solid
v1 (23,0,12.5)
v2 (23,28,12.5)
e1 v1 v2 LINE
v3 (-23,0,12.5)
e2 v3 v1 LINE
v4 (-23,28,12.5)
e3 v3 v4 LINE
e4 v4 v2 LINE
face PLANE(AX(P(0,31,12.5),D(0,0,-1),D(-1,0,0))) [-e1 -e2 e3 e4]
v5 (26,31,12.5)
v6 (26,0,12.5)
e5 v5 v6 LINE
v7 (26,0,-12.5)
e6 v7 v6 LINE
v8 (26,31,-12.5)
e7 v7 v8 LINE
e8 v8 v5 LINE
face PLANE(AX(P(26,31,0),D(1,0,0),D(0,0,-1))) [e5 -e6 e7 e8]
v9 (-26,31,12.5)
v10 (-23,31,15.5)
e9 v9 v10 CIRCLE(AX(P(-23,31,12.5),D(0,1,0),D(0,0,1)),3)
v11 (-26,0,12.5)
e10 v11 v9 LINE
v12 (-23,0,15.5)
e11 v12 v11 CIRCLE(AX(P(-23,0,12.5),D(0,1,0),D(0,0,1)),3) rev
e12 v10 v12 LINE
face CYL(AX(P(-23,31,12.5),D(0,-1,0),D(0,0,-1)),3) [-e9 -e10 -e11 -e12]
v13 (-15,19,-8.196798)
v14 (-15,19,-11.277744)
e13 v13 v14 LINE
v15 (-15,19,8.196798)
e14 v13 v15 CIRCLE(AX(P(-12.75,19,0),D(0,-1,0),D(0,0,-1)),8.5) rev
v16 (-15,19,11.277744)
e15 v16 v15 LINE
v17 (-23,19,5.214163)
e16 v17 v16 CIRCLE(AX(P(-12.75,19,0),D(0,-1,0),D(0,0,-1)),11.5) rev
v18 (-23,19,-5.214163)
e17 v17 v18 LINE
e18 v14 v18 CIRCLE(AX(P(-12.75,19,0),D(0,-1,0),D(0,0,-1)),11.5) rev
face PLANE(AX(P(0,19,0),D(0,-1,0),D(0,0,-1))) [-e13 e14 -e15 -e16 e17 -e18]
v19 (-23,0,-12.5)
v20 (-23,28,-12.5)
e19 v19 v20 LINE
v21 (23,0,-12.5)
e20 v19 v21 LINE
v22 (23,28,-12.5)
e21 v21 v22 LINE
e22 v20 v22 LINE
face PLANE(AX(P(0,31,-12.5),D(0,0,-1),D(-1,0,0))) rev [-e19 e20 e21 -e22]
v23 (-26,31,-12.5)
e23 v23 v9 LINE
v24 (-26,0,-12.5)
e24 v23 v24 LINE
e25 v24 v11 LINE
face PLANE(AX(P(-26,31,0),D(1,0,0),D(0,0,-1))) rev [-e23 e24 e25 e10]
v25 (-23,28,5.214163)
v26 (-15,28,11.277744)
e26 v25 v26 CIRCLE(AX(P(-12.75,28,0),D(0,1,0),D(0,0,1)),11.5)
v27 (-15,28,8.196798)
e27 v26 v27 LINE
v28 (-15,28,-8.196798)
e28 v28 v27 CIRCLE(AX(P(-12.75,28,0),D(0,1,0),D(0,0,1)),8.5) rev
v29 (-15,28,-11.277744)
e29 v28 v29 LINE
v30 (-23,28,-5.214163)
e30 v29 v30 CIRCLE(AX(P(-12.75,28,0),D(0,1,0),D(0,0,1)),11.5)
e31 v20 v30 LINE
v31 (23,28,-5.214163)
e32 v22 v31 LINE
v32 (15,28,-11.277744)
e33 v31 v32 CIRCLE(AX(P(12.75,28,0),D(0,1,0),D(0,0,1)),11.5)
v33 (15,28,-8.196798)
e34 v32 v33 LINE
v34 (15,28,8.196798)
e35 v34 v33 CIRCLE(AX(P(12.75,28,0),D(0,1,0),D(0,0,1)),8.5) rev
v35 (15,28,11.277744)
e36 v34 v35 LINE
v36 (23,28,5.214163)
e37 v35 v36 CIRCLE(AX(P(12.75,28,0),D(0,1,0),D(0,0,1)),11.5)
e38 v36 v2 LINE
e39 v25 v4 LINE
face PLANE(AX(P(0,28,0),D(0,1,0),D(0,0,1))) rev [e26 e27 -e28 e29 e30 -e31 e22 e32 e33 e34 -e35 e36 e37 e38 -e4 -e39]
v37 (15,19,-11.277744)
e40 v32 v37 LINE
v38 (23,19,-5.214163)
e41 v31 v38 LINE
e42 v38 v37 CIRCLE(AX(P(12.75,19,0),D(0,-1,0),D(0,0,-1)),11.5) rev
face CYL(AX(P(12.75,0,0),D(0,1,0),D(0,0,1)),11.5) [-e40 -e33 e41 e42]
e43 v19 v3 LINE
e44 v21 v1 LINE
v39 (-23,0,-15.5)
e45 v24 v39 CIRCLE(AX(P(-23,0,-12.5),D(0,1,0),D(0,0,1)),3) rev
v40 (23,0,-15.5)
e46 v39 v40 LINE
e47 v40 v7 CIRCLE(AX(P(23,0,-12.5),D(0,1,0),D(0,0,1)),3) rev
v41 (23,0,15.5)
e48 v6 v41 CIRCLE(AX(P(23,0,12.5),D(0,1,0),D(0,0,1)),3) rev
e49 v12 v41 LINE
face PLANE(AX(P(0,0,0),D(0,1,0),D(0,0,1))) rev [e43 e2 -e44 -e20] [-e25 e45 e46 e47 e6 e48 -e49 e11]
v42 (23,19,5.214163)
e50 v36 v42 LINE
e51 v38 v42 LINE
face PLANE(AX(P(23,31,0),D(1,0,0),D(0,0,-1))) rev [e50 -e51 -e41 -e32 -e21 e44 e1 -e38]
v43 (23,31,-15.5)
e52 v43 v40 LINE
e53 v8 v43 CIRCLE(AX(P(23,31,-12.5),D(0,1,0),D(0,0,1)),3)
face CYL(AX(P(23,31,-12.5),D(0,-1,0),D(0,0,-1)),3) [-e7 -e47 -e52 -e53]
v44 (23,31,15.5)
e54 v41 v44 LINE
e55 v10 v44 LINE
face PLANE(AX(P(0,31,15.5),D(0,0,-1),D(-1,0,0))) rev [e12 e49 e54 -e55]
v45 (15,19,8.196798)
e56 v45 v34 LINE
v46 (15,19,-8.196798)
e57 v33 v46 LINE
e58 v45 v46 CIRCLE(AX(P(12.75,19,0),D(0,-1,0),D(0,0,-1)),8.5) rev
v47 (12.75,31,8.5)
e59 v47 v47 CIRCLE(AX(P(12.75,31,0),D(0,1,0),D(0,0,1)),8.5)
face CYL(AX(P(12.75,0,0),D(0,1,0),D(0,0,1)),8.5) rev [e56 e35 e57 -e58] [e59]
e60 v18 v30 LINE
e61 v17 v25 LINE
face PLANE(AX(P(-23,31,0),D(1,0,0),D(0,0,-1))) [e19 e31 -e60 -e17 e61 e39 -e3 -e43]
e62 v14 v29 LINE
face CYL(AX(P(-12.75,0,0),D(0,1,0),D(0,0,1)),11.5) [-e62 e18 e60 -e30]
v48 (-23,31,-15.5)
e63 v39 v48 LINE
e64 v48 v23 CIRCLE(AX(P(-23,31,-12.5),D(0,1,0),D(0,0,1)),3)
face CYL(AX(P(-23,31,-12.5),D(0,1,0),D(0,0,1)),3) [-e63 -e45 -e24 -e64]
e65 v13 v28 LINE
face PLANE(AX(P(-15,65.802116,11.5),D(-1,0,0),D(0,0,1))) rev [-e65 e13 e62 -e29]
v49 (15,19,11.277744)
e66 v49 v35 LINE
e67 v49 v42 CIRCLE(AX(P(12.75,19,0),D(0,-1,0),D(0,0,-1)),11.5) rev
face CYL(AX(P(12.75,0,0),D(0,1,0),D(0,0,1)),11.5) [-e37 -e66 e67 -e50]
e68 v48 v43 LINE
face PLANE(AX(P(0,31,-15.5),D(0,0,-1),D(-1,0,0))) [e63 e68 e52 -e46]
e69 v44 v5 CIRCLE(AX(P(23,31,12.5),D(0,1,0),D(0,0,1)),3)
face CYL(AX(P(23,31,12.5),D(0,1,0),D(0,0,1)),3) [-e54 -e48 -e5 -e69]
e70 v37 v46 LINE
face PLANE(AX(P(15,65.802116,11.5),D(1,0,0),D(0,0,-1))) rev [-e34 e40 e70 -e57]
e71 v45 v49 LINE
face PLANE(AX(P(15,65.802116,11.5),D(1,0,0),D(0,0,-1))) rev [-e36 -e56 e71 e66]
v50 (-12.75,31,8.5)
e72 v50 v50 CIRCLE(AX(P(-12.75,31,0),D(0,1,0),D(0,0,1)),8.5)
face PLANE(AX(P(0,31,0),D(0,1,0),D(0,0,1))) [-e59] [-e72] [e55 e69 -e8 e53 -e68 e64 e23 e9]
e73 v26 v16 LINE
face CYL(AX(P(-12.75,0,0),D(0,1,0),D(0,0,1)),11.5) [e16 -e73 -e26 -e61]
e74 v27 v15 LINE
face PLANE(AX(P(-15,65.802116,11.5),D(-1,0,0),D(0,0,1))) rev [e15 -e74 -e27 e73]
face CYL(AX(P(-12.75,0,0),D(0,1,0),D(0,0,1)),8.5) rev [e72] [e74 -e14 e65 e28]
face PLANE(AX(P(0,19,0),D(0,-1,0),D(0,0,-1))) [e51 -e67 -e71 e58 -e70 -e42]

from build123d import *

# Parameters (mm, degrees)
CROQUIS1_W              = 52
CROQUIS1_H              = 31
CROQUIS1_W_2            = 46
CROQUIS1_H_2            = 25
SALIENTE_EXTRUIR1_DEPTH = 31
CROQUIS2_R              = 8.5
CORTAR_EXTRUIR1_DEPTH   = 31
REDONDEO1_R             = 3
VACIADO1_DEPTH          = 28
CROQUIS3_W              = 46
CROQUIS3_H              = 25
CORTAR_EXTRUIR2_DEPTH   = 19
CROQUIS4_W              = 30
CROQUIS4_H              = 23
CORTAR_EXTRUIR3_DEPTH   = 9


# Read off the part's stored shape, not the designer's step: Vaciado1
with BuildPart() as part:
    # Croquis1 → Saliente-Extruir1 (new body)
    # profile 1 of 2: a face of its own
    with BuildSketch(Plane(origin=(0, 0, 0), x_dir=(1, 0, 0), z_dir=(0, 1, 0))):
        Rectangle(CROQUIS1_W, CROQUIS1_H)
        Rectangle(CROQUIS1_W_2, CROQUIS1_H_2, mode=Mode.SUBTRACT)
    # profile 2 of 2: a face of its own
    with BuildSketch(Plane(origin=(0, 0, 0), x_dir=(1, 0, 0), z_dir=(0, 1, 0))):
        Rectangle(CROQUIS1_W_2, CROQUIS1_H_2)
    extrude(amount=SALIENTE_EXTRUIR1_DEPTH)

    # Croquis2 → Cortar-Extruir1 (cut)
    with BuildSketch(Plane(origin=(0, 31, 0), x_dir=(1, 0, 0), z_dir=(0, 1, 0))):
        with Locations(Location((-12.75, 0, 0), (0, 0, 270))):
            Circle(CROQUIS2_R)
        with Locations(Location((12.75, 0, 0), (0, 0, 270))):
            Circle(CROQUIS2_R)
    extrude(amount=-CORTAR_EXTRUIR1_DEPTH, mode=Mode.SUBTRACT)

    # Redondeo1
    redondeo1_edges = [part.edges().sort_by_distance(p)[0] for p in [
        (26, 15.5, 15.5),
        (-26, 15.5, 15.5),
        (-26, 15.5, -15.5),
        (26, 15.5, -15.5),
    ]]
    fillet(redondeo1_edges, radius=REDONDEO1_R)

    # Vaciado1 outline → Vaciado1 (cut)
    with BuildSketch(Plane(origin=(0, 0, 0), x_dir=(1, 0, 0), z_dir=(0, 1, 0))):
        with BuildLine():
            Line((-23, 12.5), (-23, 5.214163404))
            ThreePointArc((-23, 5.214163404), (-1.25, 0), (-23, -5.214163404))
            Line((-23, -5.214163404), (-23, -12.5))
            Line((-23, -12.5), (23, -12.5))
            Line((23, -12.5), (23, -5.214163404))
            ThreePointArc((23, -5.214163404), (1.25, 0), (23, 5.214163404))
            Line((23, 5.214163404), (23, 12.5))
            Line((23, 12.5), (-23, 12.5))
        make_face()
    extrude(amount=VACIADO1_DEPTH, mode=Mode.SUBTRACT)

    # Croquis3 → Cortar-Extruir2 (cut)
    with BuildSketch(Plane.XZ):
        Rectangle(CROQUIS3_W, CROQUIS3_H)
    extrude(amount=-CORTAR_EXTRUIR2_DEPTH, mode=Mode.SUBTRACT)

    # Croquis4 → Cortar-Extruir3 (cut)
    with BuildSketch(Plane.XZ.offset(-19)):
        Rectangle(CROQUIS4_W, CROQUIS4_H)
    extrude(amount=-CORTAR_EXTRUIR3_DEPTH, mode=Mode.SUBTRACT)


solid = part.part
